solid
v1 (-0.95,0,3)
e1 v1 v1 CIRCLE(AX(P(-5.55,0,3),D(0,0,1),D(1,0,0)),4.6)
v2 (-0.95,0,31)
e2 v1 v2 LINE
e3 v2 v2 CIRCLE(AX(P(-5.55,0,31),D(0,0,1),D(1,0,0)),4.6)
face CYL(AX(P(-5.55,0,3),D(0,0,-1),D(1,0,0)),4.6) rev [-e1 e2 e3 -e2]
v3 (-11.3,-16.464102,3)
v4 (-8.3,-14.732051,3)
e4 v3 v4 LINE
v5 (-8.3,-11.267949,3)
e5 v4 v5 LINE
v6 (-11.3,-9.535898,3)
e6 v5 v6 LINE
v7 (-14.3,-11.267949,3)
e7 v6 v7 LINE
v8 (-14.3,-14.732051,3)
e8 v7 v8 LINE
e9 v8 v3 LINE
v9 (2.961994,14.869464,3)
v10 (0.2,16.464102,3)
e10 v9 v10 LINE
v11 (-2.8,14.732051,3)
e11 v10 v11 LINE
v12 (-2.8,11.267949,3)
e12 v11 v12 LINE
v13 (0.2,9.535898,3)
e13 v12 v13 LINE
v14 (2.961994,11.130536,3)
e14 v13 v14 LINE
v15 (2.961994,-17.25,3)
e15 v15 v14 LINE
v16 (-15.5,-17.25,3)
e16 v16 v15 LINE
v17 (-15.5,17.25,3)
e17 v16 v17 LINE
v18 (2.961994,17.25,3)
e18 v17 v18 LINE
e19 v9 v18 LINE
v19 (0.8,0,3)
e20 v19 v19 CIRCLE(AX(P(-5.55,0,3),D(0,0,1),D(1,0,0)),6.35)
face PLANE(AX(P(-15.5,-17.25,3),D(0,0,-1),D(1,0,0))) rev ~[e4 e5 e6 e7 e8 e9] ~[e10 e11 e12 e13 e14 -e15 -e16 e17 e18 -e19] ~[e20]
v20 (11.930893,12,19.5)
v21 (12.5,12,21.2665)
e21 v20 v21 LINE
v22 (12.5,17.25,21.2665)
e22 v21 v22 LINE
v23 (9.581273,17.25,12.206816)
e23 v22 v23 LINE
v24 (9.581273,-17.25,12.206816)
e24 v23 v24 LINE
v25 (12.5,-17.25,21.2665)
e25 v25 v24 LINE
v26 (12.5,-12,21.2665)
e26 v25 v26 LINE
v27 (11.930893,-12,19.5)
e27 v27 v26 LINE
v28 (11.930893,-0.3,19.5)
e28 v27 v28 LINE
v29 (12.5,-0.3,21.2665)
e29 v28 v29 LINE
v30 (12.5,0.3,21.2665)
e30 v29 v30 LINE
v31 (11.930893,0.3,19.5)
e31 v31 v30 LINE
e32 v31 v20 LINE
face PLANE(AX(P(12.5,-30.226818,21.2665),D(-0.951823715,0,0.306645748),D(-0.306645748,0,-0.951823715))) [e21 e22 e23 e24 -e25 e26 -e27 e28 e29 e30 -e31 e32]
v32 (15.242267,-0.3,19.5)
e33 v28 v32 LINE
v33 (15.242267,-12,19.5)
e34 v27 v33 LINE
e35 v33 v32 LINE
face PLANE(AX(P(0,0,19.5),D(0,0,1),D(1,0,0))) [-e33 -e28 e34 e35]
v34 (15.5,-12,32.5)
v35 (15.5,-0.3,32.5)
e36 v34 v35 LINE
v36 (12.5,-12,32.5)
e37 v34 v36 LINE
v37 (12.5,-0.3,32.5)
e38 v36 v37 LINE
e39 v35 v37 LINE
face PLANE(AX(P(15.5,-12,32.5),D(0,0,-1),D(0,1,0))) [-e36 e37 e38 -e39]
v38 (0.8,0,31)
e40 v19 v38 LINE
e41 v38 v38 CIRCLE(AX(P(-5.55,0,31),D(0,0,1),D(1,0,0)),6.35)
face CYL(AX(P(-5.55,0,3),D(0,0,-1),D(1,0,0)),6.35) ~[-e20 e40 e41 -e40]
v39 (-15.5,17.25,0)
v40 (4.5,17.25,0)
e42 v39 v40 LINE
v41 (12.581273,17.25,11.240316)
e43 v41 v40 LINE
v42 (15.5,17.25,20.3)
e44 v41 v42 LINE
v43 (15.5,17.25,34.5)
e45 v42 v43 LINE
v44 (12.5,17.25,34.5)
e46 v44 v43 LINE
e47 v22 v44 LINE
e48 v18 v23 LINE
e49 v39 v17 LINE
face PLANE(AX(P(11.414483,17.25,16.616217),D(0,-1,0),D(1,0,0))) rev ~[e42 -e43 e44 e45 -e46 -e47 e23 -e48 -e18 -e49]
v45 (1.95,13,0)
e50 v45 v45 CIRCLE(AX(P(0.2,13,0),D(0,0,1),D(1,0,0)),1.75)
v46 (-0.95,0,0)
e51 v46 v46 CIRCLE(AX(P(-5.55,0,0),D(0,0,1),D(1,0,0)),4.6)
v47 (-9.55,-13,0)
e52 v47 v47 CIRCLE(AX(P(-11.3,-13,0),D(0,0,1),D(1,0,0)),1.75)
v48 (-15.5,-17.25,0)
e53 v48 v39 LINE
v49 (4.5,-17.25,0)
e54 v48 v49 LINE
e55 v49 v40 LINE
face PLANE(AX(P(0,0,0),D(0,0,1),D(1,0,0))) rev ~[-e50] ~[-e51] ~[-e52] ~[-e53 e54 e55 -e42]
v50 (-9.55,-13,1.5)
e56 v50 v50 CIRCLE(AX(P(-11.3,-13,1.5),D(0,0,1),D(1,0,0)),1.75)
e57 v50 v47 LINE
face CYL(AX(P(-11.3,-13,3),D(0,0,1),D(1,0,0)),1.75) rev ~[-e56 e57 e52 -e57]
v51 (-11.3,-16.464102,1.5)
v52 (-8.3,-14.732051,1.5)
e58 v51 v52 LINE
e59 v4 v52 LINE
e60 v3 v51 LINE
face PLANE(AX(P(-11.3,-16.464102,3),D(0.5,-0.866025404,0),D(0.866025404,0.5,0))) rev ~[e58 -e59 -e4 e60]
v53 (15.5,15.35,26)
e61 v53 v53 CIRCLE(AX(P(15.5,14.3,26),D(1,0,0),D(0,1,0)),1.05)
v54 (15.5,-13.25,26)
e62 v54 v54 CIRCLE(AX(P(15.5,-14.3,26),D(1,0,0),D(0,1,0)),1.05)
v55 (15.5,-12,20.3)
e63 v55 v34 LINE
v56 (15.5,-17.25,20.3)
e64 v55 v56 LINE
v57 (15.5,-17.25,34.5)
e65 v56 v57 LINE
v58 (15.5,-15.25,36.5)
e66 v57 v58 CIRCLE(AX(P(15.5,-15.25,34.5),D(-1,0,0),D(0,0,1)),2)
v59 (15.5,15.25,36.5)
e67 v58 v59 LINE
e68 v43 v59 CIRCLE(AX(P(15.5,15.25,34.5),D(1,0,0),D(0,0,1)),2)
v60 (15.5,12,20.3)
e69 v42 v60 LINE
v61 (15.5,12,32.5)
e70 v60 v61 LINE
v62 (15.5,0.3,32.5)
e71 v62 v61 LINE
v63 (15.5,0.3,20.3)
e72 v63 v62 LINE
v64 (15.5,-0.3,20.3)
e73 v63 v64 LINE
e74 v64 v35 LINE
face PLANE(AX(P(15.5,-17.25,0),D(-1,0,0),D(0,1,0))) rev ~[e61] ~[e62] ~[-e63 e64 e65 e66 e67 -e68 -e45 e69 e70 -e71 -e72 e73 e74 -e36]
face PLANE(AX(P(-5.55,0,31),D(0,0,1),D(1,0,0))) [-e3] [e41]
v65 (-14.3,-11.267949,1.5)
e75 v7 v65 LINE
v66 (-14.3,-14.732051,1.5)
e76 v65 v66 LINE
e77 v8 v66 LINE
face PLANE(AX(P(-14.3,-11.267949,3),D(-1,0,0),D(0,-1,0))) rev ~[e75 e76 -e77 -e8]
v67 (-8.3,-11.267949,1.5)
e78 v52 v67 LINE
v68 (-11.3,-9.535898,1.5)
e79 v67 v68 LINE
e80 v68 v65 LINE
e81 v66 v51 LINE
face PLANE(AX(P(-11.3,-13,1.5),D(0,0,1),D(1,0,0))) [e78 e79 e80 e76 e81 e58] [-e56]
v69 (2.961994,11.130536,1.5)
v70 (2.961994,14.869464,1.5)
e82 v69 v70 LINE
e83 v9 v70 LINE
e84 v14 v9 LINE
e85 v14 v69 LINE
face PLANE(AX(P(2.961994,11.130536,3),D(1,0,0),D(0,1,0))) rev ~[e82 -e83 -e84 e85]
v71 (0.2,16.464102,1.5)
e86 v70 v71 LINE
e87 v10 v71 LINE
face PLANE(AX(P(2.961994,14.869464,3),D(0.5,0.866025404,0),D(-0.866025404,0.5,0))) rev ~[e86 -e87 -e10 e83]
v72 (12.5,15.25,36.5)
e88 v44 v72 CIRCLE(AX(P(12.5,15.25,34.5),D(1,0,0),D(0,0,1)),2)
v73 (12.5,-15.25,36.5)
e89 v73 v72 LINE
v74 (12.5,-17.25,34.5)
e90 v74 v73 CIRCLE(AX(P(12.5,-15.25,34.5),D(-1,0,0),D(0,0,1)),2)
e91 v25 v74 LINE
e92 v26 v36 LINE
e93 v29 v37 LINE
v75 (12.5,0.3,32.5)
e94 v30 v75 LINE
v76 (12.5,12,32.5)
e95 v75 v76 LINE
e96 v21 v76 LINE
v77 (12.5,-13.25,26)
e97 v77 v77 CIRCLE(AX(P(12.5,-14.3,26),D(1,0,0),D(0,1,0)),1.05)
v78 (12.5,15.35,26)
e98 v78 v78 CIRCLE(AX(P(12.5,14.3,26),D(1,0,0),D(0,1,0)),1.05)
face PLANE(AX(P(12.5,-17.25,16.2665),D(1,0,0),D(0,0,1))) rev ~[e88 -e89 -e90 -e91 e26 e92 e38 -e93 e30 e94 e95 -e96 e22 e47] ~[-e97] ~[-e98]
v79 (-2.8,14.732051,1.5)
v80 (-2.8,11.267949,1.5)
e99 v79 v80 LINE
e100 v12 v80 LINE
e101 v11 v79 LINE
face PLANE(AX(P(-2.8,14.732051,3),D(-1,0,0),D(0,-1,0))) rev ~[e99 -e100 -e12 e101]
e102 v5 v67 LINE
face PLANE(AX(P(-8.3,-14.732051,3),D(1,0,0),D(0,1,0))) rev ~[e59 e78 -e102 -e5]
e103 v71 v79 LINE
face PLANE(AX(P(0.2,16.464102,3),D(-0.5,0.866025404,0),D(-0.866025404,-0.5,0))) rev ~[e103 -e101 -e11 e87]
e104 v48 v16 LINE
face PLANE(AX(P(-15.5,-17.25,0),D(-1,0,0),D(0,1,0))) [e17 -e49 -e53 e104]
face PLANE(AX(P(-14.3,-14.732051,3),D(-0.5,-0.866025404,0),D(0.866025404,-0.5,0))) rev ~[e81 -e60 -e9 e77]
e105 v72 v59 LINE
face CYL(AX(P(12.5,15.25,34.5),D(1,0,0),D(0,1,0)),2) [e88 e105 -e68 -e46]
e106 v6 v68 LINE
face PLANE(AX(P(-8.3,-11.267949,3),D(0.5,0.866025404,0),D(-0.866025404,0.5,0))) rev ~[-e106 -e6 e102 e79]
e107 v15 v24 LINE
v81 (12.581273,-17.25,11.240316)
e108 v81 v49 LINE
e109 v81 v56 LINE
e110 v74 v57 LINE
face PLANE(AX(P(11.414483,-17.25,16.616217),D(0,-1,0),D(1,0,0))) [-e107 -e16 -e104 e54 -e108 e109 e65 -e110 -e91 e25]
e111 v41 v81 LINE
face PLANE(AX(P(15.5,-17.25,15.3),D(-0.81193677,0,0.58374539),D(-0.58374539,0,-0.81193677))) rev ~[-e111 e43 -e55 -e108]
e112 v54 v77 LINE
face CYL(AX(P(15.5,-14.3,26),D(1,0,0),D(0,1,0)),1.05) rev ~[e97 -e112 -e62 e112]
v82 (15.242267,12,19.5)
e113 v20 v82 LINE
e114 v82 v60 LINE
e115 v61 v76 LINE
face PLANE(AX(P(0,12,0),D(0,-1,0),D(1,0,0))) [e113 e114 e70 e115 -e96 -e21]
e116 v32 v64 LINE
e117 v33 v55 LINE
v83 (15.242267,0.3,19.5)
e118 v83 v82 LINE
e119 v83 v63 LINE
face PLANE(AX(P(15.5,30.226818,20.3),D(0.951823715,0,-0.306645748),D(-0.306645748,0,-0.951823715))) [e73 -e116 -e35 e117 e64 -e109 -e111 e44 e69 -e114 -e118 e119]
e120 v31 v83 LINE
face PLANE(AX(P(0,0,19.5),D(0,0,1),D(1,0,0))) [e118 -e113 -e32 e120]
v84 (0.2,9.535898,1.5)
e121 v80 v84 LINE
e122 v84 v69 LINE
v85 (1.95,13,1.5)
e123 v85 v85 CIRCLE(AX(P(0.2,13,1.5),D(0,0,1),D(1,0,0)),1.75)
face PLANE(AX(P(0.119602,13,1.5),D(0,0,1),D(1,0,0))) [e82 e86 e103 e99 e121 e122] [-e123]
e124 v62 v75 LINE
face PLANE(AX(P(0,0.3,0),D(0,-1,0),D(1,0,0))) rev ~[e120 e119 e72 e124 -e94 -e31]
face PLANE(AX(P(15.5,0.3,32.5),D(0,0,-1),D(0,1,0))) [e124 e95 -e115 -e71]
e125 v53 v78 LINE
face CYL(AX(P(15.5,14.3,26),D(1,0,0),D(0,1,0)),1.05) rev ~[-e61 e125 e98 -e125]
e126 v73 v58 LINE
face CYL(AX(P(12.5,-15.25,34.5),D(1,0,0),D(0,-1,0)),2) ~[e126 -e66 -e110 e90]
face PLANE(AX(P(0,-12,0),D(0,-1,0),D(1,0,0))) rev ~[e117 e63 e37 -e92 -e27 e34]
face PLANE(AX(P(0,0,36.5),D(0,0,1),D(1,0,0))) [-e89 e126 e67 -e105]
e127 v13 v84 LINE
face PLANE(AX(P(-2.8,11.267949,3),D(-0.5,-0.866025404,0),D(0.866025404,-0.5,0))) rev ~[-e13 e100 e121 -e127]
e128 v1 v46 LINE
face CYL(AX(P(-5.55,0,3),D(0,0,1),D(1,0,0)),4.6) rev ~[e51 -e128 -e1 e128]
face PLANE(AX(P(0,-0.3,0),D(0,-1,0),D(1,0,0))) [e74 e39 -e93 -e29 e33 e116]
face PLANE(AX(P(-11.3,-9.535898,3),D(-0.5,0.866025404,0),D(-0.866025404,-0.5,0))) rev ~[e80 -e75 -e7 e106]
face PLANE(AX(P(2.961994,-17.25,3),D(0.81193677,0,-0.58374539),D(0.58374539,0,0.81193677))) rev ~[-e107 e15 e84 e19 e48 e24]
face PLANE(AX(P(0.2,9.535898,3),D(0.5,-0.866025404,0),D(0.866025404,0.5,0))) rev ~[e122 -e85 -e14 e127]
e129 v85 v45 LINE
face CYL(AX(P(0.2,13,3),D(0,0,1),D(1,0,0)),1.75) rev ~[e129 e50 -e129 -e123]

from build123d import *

# Parameters (mm, degrees)
F0_W          = 31
F0_H          = 34.5
F1_DEPTH      = 36.5
F3_DEPTH      = 34.5
F5_R          = 6.35
F5_R_2        = 4.6
F6_DEPTH      = 28
F7_W          = 11.7
F7_H          = 13
F7_R          = 1.05
F8_DEPTH      = 3.0000000261
F4_R          = 1.75
F9_DEPTH      = 3.0000000261
F10_DEPTH     = 1.5
F11_DEPTH     = 3.0000000261
F12_R         = 2
F13_T4_DEPTH  = 47.4768176547
F13_T9_DEPTH  = 47.4768176547
F13_T15_DEPTH = 60.4536353093
F13_T21_DEPTH = 47.4768176547
F13_T23_DEPTH = 60.4536353093


# Not quite as in the source:
# - a fillet or chamfer that OpenCascade refuses, or shapes differently, is made with other operations: its cross-section is extruded or revolved along the edge and cut away or added
# - a feature names something its author has since deleted; it is built from what else it names


with BuildPart() as f1:
    # F0 (on Top) → F1 (new body)
    with BuildSketch(Plane.XY):
        Rectangle(F0_W, F0_H)
    extrude(amount=F1_DEPTH)

    # F2 (on face) → F3 (cut, through all)
    with BuildSketch(Plane.XZ.offset(17.25)):
        Polygon((-15.5, 36.5), (-15.5, 3.0000000261), (2.9619937352, 3.0000000261), (12.4999999739, 16.2664996126), (12.4999999739, 36.5), align=None)
        Polygon((15.5, 15.3), (4.5, 0), (15.5, 0), align=None)
    extrude(amount=-F3_DEPTH, mode=Mode.SUBTRACT)

    # F5 (on face) → F6 (join)
    with BuildSketch(Plane.XY.offset(3.0000000261)):
        with Locations((-5.55, 0)):
            Circle(F5_R)
        with Locations((-5.55, 0)):
            Circle(F5_R_2, mode=Mode.SUBTRACT)
    extrude(amount=F6_DEPTH)

    # F7 (on face) → F8 (cut, through all)
    with BuildSketch(Plane.YZ.offset(15.5)):
        with Locations((6.15, 26)):
            Rectangle(F7_W, F7_H)
        with Locations((-6.15, 26)):
            Rectangle(F7_W, F7_H)
        with Locations((-14.3, 26)):
            Circle(F7_R)
        with Locations((14.3, 26)):
            Circle(F7_R)
    extrude(amount=-F8_DEPTH, mode=Mode.SUBTRACT)

    # F4 (on face) → F9 (cut, through all)
    with BuildSketch(Plane.XY.offset(3.0000000261)):
        with Locations((-11.3, -13)):
            Circle(F4_R)
        with Locations((0.2, 13)):
            Circle(F4_R)
    extrude(amount=-F9_DEPTH, mode=Mode.SUBTRACT)

    # F4 (on face) → F10 (cut)
    with BuildSketch(Plane.XY.offset(3.0000000261)):
        Polygon((-14.3, -11.2679491924), (-14.3, -14.7320508076), (-11.3, -16.4641016151), (-8.3, -14.7320508076), (-8.3, -11.2679491924), (-11.3, -9.5358983849), align=None)
        with Locations((-11.3, -13)):
            Circle(F4_R, mode=Mode.SUBTRACT)
        Polygon((0.2, 16.4641016151), (-2.8, 14.7320508076), (-2.8, 11.2679491924), (0.2, 9.5358983849), (2.9619937352, 11.1305362114), (2.9619937352, 14.8694637886), align=None)
        with Locations((0.2, 13)):
            Circle(F4_R, mode=Mode.SUBTRACT)
    extrude(amount=-F10_DEPTH, mode=Mode.SUBTRACT)

    # F5 (on face) → F11 (cut, through all)
    with BuildSketch(Plane.XY.offset(3.0000000261)):
        with Locations((-5.55, 0)):
            Circle(F5_R_2)
    extrude(amount=-F11_DEPTH, mode=Mode.SUBTRACT)

    # F12
    f12_edges = [f1.edges().sort_by_distance(p)[0] for p in [
        (14, -17.25, 36.5),
        (14, 17.25, 36.5),
    ]]
    fillet(f12_edges, radius=F12_R)

    # F13: chamfer of 5 on 2 edges, made by hand


with BuildPart() as f13_tool2:
    # F13_s3 → F13_t4 (new body)
    with BuildSketch(Plane.XZ.offset(17.25)):
        Polygon((12.4999999739, 21.2664996126), (9.5812730216, 12.2068157607), (12.4999999739, 16.2664996126), align=None)
    extrude(amount=-F13_T4_DEPTH)

    split(bisect_by=Plane.XZ.offset(12), keep=Keep.TOP)


with BuildPart() as f1_1:
    add(f1.part)

    # F13_t1: union F13_tool2
    add(f13_tool2.part)


with BuildPart() as f13_tool7:
    # F13_s8 → F13_t9 (new body)
    with BuildSketch(Plane.XZ.offset(30.2268176547)):
        Polygon((12.4999999739, 21.2664996126), (9.5812730216, 12.2068157607), (12.4999999739, 16.2664996126), align=None)
    extrude(amount=-F13_T9_DEPTH)

    split(bisect_by=Plane.XY.offset(19.5), keep=Keep.BOTTOM)

    split(bisect_by=Plane.XZ.offset(12), keep=Keep.BOTTOM)


with BuildPart() as f1_2:
    add(f1_1.part)

    # F13_t6: union F13_tool7
    add(f13_tool7.part)


with BuildPart() as f13_tool13:
    # F13_s14 → F13_t15 (new body)
    with BuildSketch(Plane.XZ.offset(30.2268176547)):
        Polygon((12.4999999739, 21.2664996126), (9.5812730216, 12.2068157607), (12.4999999739, 16.2664996126), align=None)
    extrude(amount=-F13_T15_DEPTH)

    split(bisect_by=Plane.XZ.offset(-0.3), keep=Keep.TOP)

    split(bisect_by=Plane.XZ.offset(0.3), keep=Keep.BOTTOM)


with BuildPart() as f1_3:
    add(f1_2.part)

    # F13_t12: union F13_tool13
    add(f13_tool13.part)


with BuildPart() as f13_tool19:
    # F13_s20 → F13_t21 (new body)
    with BuildSketch(Plane.XZ.offset(30.2268176547)):
        Polygon((12.4999999739, 21.2664996126), (9.5812730216, 12.2068157607), (12.4999999739, 16.2664996126), align=None)
    extrude(amount=-F13_T21_DEPTH)

    split(bisect_by=Plane.XZ.offset(-12), keep=Keep.BOTTOM)


with BuildPart() as f1_4:
    add(f1_3.part)

    # F13_t18: union F13_tool19
    add(f13_tool19.part)

    # F13_s24 → F13_t23 (cut)
    with BuildSketch(Plane.XZ.offset(-30.2268176547)):
        Polygon((15.5, 20.3), (12.5812730476, 11.2403161481), (15.5, 15.3), align=None)
    extrude(amount=F13_T23_DEPTH, mode=Mode.SUBTRACT)


solid = f1_4.part
